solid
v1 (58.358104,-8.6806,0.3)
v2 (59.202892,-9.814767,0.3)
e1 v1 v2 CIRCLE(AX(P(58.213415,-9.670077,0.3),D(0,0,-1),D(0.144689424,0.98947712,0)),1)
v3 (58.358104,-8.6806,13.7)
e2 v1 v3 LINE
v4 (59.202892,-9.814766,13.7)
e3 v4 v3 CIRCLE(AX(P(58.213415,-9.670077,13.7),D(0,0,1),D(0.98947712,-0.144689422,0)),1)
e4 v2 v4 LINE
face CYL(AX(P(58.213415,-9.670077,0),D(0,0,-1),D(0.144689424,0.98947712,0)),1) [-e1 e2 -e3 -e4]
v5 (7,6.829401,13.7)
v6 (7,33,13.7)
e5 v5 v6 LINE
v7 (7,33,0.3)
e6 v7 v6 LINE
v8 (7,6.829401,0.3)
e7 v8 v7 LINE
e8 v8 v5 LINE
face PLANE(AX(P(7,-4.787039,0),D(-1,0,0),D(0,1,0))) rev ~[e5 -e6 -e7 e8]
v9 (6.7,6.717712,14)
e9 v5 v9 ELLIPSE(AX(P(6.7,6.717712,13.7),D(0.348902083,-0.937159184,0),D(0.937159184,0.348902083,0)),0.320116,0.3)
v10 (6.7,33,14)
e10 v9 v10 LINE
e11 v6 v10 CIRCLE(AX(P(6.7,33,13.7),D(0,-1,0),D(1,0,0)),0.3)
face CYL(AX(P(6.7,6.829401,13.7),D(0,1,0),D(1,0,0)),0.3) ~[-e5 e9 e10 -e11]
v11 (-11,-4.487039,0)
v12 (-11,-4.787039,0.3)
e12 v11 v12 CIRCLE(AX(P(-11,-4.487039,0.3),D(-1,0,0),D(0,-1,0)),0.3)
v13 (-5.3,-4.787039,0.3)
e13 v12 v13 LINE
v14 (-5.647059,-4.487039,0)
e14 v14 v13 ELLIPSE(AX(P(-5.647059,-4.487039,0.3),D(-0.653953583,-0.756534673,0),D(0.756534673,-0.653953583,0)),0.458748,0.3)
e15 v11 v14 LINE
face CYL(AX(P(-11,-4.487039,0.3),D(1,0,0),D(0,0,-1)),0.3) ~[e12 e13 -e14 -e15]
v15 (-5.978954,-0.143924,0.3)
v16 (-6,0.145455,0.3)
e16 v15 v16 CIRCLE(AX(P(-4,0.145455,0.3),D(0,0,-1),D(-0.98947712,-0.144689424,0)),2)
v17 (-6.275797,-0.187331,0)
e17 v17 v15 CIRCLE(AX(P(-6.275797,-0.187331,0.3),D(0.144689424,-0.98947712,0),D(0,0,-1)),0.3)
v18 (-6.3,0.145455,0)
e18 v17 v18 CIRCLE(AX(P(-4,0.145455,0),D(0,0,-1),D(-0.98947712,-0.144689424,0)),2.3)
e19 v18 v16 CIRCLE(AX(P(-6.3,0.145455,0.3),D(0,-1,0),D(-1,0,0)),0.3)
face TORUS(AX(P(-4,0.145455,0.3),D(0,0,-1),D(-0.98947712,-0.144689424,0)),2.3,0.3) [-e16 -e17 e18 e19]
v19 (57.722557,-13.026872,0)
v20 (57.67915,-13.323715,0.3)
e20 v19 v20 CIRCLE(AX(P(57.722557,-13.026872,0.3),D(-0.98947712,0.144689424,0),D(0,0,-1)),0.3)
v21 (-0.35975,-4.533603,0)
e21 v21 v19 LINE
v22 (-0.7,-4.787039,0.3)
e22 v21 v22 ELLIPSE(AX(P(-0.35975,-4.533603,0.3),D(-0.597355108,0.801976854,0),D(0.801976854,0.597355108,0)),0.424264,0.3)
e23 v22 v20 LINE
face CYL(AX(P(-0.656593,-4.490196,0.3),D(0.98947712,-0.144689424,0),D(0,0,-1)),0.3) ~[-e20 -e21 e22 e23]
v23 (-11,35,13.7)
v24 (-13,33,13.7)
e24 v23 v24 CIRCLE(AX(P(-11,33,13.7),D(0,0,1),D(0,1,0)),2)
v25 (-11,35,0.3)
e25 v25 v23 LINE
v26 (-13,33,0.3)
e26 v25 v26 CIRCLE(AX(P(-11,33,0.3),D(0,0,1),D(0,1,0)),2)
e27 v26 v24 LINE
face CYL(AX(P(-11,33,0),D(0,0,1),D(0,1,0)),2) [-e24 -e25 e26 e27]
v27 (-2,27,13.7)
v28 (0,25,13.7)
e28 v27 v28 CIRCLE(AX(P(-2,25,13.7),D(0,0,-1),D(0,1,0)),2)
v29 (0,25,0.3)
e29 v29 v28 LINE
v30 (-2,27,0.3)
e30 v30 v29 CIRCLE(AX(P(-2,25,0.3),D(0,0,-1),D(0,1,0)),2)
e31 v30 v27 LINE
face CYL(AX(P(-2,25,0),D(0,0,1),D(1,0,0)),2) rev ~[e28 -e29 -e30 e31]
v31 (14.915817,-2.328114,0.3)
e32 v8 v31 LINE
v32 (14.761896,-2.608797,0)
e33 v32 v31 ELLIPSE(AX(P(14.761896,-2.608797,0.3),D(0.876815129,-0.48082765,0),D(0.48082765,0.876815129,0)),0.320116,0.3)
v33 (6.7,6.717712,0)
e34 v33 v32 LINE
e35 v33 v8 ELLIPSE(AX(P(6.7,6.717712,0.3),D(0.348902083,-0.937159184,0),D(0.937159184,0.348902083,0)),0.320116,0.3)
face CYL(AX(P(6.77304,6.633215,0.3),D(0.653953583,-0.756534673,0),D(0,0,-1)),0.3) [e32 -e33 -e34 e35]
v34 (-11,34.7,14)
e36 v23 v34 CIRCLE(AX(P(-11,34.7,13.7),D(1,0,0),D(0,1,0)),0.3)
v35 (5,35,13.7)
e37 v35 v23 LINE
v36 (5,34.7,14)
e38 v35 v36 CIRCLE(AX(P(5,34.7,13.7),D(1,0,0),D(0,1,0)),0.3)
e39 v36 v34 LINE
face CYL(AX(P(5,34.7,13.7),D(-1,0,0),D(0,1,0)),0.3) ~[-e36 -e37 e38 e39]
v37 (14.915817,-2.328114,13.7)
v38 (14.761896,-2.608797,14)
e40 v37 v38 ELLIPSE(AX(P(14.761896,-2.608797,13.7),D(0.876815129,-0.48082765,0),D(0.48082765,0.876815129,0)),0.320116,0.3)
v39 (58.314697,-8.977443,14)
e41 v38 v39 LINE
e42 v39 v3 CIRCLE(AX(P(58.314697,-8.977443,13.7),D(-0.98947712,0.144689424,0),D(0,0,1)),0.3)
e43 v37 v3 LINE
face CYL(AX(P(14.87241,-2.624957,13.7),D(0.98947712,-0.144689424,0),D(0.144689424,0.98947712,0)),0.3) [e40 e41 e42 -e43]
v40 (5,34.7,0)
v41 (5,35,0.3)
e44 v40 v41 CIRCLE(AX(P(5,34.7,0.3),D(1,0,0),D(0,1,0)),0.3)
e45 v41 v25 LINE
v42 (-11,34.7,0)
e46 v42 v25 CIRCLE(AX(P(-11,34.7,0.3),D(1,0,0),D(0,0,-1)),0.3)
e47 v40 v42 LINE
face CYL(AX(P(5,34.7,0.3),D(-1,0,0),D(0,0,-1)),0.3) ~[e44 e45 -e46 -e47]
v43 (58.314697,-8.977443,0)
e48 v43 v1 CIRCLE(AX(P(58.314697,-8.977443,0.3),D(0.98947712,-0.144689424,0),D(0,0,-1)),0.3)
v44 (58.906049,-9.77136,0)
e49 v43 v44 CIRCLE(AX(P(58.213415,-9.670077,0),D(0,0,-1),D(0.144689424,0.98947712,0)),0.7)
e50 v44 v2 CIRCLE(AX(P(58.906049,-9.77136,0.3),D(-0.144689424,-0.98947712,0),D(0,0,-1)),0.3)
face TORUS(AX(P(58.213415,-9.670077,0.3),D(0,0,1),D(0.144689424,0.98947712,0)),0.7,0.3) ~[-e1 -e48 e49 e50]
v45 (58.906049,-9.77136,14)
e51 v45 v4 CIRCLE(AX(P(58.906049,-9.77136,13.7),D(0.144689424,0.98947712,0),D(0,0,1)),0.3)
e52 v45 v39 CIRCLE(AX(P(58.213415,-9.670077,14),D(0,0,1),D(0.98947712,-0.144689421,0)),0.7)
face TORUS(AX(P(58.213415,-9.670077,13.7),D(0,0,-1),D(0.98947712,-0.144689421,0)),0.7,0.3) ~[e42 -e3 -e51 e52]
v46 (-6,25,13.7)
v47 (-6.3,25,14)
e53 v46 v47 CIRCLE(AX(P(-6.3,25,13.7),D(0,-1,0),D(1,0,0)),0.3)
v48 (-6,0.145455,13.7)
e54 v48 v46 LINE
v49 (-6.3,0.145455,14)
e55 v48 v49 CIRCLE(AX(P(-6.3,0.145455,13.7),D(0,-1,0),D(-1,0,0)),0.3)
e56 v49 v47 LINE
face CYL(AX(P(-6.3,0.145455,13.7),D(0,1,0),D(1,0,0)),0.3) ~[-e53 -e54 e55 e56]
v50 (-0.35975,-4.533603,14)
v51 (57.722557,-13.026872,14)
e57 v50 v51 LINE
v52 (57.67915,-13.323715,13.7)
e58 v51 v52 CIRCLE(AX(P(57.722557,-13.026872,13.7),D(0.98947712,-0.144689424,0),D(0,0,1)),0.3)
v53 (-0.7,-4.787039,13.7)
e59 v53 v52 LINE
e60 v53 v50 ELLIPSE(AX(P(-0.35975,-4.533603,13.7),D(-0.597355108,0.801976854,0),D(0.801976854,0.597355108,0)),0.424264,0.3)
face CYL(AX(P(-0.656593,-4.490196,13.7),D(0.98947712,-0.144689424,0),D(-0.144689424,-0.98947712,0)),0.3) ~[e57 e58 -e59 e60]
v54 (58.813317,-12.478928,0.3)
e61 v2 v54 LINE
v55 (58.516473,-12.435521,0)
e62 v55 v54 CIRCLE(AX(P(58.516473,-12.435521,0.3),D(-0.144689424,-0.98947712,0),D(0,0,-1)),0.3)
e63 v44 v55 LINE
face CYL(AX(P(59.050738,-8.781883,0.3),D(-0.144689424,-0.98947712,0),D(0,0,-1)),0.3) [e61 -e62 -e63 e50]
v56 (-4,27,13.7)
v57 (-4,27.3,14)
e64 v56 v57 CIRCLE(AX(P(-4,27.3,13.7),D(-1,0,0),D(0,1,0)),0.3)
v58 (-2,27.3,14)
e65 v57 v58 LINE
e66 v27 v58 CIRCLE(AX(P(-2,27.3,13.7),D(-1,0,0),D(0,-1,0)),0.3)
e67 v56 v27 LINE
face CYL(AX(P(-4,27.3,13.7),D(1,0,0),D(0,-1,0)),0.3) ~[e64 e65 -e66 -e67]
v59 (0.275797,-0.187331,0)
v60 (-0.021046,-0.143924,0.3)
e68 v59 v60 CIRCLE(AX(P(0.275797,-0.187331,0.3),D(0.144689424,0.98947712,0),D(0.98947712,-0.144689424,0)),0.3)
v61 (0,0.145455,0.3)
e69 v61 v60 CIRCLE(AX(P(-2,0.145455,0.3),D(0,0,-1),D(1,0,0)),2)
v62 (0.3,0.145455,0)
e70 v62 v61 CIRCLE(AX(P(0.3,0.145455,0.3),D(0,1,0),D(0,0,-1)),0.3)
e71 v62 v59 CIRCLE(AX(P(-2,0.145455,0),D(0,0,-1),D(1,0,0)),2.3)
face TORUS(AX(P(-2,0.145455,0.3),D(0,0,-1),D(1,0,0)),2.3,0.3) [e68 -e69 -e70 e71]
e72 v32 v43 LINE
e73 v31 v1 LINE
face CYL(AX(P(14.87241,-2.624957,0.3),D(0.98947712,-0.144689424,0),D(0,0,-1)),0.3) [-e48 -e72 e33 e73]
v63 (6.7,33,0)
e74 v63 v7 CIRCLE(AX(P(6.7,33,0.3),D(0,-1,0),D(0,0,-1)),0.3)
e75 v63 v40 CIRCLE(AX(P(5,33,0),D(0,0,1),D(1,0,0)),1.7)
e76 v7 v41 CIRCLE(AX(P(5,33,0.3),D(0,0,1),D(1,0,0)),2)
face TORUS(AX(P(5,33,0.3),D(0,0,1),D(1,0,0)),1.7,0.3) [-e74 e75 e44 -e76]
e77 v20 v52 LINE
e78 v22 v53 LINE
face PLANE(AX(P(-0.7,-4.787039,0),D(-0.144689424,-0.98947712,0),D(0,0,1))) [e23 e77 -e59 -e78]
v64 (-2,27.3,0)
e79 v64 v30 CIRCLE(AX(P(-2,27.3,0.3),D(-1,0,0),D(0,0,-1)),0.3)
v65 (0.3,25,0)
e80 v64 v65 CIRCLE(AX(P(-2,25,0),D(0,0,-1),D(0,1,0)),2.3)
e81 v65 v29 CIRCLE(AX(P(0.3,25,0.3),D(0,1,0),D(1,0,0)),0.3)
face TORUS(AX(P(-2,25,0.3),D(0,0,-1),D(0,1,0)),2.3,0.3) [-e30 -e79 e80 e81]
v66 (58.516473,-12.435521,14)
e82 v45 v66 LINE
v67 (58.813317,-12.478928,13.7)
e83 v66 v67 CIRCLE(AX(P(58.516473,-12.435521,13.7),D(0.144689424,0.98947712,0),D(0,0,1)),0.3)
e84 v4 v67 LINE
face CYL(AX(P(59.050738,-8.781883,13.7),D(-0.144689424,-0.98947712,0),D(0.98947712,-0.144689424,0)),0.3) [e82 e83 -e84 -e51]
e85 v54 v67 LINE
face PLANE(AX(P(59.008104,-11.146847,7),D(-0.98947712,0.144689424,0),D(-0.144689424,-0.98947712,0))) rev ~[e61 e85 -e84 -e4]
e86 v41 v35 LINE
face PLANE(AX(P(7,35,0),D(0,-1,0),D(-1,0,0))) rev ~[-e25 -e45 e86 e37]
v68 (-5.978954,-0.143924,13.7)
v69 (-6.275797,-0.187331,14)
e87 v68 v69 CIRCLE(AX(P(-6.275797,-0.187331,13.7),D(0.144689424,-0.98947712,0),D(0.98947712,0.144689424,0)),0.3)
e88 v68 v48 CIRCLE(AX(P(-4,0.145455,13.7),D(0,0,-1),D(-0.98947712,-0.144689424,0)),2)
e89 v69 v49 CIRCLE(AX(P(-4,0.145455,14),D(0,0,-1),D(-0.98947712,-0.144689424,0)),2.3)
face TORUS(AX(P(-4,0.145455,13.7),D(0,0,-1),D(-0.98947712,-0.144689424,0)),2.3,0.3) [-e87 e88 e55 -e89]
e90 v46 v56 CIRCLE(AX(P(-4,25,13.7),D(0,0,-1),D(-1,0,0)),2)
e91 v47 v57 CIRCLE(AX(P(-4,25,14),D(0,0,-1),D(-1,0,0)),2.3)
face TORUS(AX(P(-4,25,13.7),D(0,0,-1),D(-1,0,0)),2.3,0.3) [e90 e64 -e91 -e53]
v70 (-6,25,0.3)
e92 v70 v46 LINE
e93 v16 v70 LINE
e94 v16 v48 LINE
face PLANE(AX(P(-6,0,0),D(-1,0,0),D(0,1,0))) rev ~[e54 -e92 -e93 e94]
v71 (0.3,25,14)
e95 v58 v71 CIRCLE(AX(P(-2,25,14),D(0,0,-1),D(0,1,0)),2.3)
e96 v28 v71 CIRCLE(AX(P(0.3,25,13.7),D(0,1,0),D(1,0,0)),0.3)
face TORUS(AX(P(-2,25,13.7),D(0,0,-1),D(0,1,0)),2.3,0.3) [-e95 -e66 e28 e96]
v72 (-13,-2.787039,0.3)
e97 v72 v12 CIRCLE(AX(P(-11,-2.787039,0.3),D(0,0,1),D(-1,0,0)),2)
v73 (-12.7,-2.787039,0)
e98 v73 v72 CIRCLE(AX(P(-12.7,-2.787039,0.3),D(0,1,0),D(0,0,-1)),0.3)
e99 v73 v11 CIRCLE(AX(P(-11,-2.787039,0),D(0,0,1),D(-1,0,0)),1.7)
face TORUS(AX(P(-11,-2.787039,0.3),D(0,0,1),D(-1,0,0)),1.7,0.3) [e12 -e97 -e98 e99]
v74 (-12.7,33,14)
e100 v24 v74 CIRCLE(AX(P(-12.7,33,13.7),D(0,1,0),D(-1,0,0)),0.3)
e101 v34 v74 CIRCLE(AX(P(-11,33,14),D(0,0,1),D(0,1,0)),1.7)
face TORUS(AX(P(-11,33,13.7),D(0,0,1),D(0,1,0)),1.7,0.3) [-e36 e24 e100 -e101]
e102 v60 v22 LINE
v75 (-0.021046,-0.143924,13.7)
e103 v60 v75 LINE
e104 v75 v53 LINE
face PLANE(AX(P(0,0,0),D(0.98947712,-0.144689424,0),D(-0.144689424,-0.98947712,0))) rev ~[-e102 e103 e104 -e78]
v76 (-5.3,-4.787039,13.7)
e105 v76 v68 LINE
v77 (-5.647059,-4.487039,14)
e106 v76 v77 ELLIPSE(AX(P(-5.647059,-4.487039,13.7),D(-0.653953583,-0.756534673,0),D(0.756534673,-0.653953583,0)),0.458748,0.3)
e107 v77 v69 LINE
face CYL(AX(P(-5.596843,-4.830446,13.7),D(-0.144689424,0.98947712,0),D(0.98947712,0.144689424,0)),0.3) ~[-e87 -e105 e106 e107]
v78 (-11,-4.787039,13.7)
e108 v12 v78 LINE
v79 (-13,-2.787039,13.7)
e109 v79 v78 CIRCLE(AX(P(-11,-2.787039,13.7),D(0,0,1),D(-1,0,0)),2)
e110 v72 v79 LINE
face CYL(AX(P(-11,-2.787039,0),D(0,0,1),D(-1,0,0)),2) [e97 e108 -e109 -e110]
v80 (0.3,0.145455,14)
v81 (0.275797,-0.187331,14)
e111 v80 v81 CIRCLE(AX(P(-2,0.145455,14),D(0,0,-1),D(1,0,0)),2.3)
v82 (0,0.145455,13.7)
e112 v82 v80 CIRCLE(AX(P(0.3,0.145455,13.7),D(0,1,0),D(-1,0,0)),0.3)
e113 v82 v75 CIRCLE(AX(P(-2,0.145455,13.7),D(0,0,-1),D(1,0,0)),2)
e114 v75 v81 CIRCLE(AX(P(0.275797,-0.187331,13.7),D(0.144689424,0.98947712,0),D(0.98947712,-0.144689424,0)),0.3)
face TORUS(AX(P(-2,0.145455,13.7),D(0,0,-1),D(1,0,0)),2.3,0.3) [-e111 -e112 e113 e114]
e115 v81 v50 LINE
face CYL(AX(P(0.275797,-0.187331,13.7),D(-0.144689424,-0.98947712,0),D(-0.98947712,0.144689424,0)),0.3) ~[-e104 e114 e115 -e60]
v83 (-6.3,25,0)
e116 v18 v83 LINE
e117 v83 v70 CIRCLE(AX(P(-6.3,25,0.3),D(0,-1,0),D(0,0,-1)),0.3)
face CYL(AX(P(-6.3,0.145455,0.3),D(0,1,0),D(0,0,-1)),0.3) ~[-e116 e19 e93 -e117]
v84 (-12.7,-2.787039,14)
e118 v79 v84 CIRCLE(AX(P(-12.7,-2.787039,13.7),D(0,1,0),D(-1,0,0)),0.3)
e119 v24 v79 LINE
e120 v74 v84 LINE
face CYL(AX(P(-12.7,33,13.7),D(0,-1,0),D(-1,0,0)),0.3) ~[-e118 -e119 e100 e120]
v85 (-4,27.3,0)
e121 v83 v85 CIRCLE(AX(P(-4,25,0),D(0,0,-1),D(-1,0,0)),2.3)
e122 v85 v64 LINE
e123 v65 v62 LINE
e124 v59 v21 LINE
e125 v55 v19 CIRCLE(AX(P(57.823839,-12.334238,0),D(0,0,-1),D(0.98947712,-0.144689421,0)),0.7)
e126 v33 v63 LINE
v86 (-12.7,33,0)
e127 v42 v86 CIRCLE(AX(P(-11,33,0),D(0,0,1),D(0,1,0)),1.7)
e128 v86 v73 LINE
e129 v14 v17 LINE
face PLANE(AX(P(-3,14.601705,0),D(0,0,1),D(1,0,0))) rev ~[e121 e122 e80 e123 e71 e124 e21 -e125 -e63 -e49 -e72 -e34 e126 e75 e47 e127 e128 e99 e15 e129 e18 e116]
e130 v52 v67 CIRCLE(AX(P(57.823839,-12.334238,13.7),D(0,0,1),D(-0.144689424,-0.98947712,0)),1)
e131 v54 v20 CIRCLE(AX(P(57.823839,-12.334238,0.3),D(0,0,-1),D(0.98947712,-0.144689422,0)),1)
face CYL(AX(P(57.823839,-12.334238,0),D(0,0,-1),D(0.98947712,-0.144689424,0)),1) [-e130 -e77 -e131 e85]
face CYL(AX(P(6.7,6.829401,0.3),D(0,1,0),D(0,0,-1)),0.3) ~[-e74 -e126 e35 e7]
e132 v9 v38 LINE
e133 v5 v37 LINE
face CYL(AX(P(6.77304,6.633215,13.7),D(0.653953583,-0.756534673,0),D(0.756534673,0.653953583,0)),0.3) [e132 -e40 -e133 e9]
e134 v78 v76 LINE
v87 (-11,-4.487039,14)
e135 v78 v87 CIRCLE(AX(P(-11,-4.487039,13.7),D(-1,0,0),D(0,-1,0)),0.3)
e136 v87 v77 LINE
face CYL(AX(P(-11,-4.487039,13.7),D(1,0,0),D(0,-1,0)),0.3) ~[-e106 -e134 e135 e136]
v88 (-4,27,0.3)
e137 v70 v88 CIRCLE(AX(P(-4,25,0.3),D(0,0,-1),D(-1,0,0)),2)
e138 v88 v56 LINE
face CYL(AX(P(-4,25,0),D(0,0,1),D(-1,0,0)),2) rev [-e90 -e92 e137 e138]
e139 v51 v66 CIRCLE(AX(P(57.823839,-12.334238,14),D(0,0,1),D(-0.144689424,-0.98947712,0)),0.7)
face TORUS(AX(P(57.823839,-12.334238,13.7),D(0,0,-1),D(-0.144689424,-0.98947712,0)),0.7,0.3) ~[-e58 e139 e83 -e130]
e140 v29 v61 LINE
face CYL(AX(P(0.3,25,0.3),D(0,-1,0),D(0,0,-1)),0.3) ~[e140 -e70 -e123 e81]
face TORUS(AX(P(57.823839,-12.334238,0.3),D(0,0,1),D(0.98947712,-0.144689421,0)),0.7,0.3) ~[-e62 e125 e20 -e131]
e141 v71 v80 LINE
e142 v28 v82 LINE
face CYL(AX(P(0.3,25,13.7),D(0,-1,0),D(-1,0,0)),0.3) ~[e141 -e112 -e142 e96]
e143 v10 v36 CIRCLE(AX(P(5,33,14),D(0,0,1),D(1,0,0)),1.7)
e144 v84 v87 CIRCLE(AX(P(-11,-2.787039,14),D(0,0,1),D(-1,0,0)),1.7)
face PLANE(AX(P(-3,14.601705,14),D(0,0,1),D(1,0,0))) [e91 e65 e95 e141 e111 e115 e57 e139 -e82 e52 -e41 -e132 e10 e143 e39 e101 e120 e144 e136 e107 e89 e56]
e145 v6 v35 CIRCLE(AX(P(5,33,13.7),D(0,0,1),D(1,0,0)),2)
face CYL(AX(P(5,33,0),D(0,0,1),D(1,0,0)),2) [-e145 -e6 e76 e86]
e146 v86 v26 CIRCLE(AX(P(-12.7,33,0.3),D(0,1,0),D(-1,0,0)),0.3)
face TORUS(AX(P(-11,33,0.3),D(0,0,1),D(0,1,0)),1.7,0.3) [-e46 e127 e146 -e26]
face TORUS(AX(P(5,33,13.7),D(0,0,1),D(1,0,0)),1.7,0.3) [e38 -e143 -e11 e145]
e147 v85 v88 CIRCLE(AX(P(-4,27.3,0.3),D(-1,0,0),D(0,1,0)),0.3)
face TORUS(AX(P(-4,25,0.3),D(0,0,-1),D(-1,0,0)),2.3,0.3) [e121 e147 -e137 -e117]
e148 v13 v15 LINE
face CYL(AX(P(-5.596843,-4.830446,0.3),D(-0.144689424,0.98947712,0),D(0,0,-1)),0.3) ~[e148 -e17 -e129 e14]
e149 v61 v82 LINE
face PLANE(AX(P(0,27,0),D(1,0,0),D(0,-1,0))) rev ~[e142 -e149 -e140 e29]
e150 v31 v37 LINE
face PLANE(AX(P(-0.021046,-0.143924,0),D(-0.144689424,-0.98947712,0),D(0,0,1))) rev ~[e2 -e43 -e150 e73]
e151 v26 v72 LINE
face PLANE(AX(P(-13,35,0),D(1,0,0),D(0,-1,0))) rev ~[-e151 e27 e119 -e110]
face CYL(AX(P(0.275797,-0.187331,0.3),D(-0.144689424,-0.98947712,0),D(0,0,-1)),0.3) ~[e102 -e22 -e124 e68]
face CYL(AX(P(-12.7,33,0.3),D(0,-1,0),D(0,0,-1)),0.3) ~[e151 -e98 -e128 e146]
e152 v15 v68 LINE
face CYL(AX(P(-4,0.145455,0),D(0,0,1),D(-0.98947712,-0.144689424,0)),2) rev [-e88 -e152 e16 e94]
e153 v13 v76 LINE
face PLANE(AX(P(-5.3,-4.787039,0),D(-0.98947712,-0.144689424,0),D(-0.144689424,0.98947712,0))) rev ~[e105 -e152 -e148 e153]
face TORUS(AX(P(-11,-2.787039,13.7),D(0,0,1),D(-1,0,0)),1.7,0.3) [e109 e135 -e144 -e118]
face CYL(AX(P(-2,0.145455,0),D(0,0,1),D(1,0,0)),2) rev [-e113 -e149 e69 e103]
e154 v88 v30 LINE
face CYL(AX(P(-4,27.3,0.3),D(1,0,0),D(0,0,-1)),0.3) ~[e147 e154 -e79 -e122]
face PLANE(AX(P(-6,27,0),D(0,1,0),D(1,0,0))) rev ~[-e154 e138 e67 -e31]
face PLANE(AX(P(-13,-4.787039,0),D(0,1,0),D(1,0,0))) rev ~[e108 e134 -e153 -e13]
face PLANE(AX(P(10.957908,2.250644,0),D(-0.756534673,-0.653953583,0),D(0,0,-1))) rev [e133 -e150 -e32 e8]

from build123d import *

# Parameters (mm, degrees)
F1_DEPTH     = 14
F2_R         = 2
F3_W         = 4.692493906
F3_H         = 14
F4_DEPTH     = 60
F5_SIZE      = 8
F6_R         = 0.3
F7_T1_DEPTH  = 14
F7_T4_ANGLE  = 90
F7_T6_ANGLE  = 90
F7_T8_ANGLE  = 90
F7_T10_ANGLE = 90


# Not quite as in the source:
# - a fillet or chamfer that OpenCascade refuses, or shapes differently, is made with other operations: its cross-section is extruded or revolved along the edge and cut away or added
# - a feature names something its author has since deleted; it is built from what else it names


with BuildPart() as f1:
    # F0 (on Top) → F1 (new body)
    with BuildSketch(Plane.XY):
        Polygon((0, 27), (0, 0), (-0.7, -4.7870394774), (7, -4.7870394774), (7, 35), (-13, 35), (-13, -4.7870394774), (-5.3, -4.7870394774), (-6, 0), (-6, 27), align=None)
    extrude(amount=F1_DEPTH)

    # F2
    f2_edges = [f1.edges().sort_by_distance(p)[0] for p in [
        (-13, 35, 7),
        (-13, -4.787039, 7),
        (0, 27, 7),
        (0, 0, 7),
        (7, 35, 7),
        (-6, 0, 7),
        (-6, 27, 7),
    ]]
    fillet(f2_edges, radius=F2_R)

    # F3 (on face) → F4 (join)
    with BuildSketch(Plane(origin=(0, 0, 0), x_dir=(-0.1446894238, -0.9894771198, 0), z_dir=(-0.9894771198, 0.1446894238, 0))):
        with Locations((2.4917016782, 7)):
            Rectangle(F3_W, F3_H)
    extrude(amount=-F4_DEPTH)

    # F5
    f5_edges = [f1.edges().sort_by_distance(p)[0] for p in [
        (7, -1.170599, 7),
    ]]
    chamfer(f5_edges, length=F5_SIZE)

    # F6
    f6_edges = [f1.edges().sort_by_distance(p)[0] for p in [
        (37.131699, -5.576702, 14),
        (10.957908, 2.250644, 14),
        (59.008104, -11.146847, 14),
        (7, 19.914701, 14),
        (28.984314, -9.127722, 14),
        (6.414214, 34.414214, 14),
        (-0.360523, -2.465482, 14),
        (-3, 35, 14),
        (-0.005268, 0.000383, 14),
        (-12.414214, 34.414214, 14),
        (0, 12.572727, 14),
        (-13, 15.10648, 14),
        (-0.585786, 26.414214, 14),
        (-12.414214, -4.201253, 14),
        (-3, 27, 14),
        (-8.15, -4.787039, 14),
        (-5.414214, 26.414214, 14),
        (-5.639477, -2.465482, 14),
        (-6, 12.572727, 14),
        (-5.994732, 0.000383, 14),
        (37.131699, -5.576702, 0),
        (10.957908, 2.250644, 0),
        (59.008104, -11.146847, 0),
        (7, 19.914701, 0),
        (28.984314, -9.127722, 0),
        (6.414214, 34.414214, 0),
        (-0.360523, -2.465482, 0),
        (-3, 35, 0),
        (-0.005268, 0.000383, 0),
        (-12.414214, 34.414214, 0),
        (0, 12.572727, 0),
        (-13, 15.10648, 0),
        (-0.585786, 26.414214, 0),
        (-12.414214, -4.201253, 0),
        (-3, 27, 0),
        (-8.15, -4.787039, 0),
        (-5.414214, 26.414214, 0),
        (-5.639477, -2.465482, 0),
        (-6, 12.572727, 0),
        (-5.994732, 0.000383, 0),
    ]]
    fillet(f6_edges, radius=F6_R)

    # F7: fillet of radius 1 on 2 edges, made by hand

    # F7_s2 → F7_t1 (cut)
    with BuildSketch(Plane.XY):
        with BuildLine():
            ThreePointArc((58.3581043085, -8.6806001289), (59.0153917386, -9.0727221402), (59.2028920045, -9.8147666726))
            Line((59.2028920045, -9.8147666726), (59.3475814283, -8.8252895527))
            Line((59.3475814283, -8.8252895527), (58.3581043085, -8.6806001289))
        make_face()
        with BuildLine():
            ThreePointArc((58.8133166125, -12.4789277878), (58.4211946012, -13.136215218), (57.6791500689, -13.3237154838))
            Line((57.6791500689, -13.3237154838), (58.6686271887, -13.4684049076))
            Line((58.6686271887, -13.4684049076), (58.8133166125, -12.4789277878))
        make_face()
    extrude(amount=F7_T1_DEPTH, mode=Mode.SUBTRACT)

    # F7_s3 → F7_t4 (revolve, cut)
    with BuildSketch(Plane(origin=(-0.5553105762, -3.7975623576, 0), x_dir=(0, 0, 1), z_dir=(0.1446894238, 0.9894771198, 0))):
        with BuildLine():
            ThreePointArc((0, 59.7), (0.0878679656, 59.9121320344), (0.3, 60))
            Line((0.3, 60), (0, 60))
            Line((0, 60), (0, 59.7))
        make_face()
    revolve(axis=Axis((57.8238394927, -12.334238364, 0), (0, 0, -1)), revolution_arc=F7_T4_ANGLE, mode=Mode.SUBTRACT)

    # F7_s5 → F7_t6 (revolve, cut)
    with BuildSketch(Plane(origin=(58.3791500689, -8.5366760064, 0), x_dir=(0, 0, 1), z_dir=(-0.9894771198, 0.1446894238, 0))):
        with BuildLine():
            ThreePointArc((14, -4.5379486312), (13.9121320344, -4.7500806655), (13.7, -4.8379486312))
            Line((13.7, -4.8379486312), (14, -4.8379486312))
            Line((14, -4.8379486312), (14, -4.5379486312))
        make_face()
    revolve(axis=Axis((57.8238394927, -12.334238364, 14), (0, 0, 1)), revolution_arc=F7_T6_ANGLE, mode=Mode.SUBTRACT)

    # F7_s7 → F7_t8 (revolve, cut)
    with BuildSketch(Plane(origin=(-0.1657351842, -1.1334012423, 0), x_dir=(0, 0, 1), z_dir=(-0.1446894238, -0.9894771198, 0))):
        with BuildLine():
            ThreePointArc((14, -59.7), (13.9121320344, -59.9121320344), (13.7, -60))
            Line((13.7, -60), (14, -60))
            Line((14, -60), (14, -59.7))
        make_face()
    revolve(axis=Axis((58.2134148846, -9.6700772487, 14), (0, 0, 1)), revolution_arc=F7_T8_ANGLE, mode=Mode.SUBTRACT)

    # F7_s9 → F7_t10 (revolve, cut)
    with BuildSketch(Plane(origin=(58.3791500689, -8.5366760064, 0), x_dir=(0, 0, 1), z_dir=(-0.9894771198, 0.1446894238, 0))):
        with BuildLine():
            ThreePointArc((0, -0.4454547252), (0.0878679656, -0.2333226908), (0.3, -0.1454547252))
            Line((0.3, -0.1454547252), (0, -0.1454547252))
            Line((0, -0.1454547252), (0, -0.4454547252))
        make_face()
    revolve(axis=Axis((58.2134148846, -9.6700772487, 0), (0, 0, -1)), revolution_arc=F7_T10_ANGLE, mode=Mode.SUBTRACT)


solid = f1.part
